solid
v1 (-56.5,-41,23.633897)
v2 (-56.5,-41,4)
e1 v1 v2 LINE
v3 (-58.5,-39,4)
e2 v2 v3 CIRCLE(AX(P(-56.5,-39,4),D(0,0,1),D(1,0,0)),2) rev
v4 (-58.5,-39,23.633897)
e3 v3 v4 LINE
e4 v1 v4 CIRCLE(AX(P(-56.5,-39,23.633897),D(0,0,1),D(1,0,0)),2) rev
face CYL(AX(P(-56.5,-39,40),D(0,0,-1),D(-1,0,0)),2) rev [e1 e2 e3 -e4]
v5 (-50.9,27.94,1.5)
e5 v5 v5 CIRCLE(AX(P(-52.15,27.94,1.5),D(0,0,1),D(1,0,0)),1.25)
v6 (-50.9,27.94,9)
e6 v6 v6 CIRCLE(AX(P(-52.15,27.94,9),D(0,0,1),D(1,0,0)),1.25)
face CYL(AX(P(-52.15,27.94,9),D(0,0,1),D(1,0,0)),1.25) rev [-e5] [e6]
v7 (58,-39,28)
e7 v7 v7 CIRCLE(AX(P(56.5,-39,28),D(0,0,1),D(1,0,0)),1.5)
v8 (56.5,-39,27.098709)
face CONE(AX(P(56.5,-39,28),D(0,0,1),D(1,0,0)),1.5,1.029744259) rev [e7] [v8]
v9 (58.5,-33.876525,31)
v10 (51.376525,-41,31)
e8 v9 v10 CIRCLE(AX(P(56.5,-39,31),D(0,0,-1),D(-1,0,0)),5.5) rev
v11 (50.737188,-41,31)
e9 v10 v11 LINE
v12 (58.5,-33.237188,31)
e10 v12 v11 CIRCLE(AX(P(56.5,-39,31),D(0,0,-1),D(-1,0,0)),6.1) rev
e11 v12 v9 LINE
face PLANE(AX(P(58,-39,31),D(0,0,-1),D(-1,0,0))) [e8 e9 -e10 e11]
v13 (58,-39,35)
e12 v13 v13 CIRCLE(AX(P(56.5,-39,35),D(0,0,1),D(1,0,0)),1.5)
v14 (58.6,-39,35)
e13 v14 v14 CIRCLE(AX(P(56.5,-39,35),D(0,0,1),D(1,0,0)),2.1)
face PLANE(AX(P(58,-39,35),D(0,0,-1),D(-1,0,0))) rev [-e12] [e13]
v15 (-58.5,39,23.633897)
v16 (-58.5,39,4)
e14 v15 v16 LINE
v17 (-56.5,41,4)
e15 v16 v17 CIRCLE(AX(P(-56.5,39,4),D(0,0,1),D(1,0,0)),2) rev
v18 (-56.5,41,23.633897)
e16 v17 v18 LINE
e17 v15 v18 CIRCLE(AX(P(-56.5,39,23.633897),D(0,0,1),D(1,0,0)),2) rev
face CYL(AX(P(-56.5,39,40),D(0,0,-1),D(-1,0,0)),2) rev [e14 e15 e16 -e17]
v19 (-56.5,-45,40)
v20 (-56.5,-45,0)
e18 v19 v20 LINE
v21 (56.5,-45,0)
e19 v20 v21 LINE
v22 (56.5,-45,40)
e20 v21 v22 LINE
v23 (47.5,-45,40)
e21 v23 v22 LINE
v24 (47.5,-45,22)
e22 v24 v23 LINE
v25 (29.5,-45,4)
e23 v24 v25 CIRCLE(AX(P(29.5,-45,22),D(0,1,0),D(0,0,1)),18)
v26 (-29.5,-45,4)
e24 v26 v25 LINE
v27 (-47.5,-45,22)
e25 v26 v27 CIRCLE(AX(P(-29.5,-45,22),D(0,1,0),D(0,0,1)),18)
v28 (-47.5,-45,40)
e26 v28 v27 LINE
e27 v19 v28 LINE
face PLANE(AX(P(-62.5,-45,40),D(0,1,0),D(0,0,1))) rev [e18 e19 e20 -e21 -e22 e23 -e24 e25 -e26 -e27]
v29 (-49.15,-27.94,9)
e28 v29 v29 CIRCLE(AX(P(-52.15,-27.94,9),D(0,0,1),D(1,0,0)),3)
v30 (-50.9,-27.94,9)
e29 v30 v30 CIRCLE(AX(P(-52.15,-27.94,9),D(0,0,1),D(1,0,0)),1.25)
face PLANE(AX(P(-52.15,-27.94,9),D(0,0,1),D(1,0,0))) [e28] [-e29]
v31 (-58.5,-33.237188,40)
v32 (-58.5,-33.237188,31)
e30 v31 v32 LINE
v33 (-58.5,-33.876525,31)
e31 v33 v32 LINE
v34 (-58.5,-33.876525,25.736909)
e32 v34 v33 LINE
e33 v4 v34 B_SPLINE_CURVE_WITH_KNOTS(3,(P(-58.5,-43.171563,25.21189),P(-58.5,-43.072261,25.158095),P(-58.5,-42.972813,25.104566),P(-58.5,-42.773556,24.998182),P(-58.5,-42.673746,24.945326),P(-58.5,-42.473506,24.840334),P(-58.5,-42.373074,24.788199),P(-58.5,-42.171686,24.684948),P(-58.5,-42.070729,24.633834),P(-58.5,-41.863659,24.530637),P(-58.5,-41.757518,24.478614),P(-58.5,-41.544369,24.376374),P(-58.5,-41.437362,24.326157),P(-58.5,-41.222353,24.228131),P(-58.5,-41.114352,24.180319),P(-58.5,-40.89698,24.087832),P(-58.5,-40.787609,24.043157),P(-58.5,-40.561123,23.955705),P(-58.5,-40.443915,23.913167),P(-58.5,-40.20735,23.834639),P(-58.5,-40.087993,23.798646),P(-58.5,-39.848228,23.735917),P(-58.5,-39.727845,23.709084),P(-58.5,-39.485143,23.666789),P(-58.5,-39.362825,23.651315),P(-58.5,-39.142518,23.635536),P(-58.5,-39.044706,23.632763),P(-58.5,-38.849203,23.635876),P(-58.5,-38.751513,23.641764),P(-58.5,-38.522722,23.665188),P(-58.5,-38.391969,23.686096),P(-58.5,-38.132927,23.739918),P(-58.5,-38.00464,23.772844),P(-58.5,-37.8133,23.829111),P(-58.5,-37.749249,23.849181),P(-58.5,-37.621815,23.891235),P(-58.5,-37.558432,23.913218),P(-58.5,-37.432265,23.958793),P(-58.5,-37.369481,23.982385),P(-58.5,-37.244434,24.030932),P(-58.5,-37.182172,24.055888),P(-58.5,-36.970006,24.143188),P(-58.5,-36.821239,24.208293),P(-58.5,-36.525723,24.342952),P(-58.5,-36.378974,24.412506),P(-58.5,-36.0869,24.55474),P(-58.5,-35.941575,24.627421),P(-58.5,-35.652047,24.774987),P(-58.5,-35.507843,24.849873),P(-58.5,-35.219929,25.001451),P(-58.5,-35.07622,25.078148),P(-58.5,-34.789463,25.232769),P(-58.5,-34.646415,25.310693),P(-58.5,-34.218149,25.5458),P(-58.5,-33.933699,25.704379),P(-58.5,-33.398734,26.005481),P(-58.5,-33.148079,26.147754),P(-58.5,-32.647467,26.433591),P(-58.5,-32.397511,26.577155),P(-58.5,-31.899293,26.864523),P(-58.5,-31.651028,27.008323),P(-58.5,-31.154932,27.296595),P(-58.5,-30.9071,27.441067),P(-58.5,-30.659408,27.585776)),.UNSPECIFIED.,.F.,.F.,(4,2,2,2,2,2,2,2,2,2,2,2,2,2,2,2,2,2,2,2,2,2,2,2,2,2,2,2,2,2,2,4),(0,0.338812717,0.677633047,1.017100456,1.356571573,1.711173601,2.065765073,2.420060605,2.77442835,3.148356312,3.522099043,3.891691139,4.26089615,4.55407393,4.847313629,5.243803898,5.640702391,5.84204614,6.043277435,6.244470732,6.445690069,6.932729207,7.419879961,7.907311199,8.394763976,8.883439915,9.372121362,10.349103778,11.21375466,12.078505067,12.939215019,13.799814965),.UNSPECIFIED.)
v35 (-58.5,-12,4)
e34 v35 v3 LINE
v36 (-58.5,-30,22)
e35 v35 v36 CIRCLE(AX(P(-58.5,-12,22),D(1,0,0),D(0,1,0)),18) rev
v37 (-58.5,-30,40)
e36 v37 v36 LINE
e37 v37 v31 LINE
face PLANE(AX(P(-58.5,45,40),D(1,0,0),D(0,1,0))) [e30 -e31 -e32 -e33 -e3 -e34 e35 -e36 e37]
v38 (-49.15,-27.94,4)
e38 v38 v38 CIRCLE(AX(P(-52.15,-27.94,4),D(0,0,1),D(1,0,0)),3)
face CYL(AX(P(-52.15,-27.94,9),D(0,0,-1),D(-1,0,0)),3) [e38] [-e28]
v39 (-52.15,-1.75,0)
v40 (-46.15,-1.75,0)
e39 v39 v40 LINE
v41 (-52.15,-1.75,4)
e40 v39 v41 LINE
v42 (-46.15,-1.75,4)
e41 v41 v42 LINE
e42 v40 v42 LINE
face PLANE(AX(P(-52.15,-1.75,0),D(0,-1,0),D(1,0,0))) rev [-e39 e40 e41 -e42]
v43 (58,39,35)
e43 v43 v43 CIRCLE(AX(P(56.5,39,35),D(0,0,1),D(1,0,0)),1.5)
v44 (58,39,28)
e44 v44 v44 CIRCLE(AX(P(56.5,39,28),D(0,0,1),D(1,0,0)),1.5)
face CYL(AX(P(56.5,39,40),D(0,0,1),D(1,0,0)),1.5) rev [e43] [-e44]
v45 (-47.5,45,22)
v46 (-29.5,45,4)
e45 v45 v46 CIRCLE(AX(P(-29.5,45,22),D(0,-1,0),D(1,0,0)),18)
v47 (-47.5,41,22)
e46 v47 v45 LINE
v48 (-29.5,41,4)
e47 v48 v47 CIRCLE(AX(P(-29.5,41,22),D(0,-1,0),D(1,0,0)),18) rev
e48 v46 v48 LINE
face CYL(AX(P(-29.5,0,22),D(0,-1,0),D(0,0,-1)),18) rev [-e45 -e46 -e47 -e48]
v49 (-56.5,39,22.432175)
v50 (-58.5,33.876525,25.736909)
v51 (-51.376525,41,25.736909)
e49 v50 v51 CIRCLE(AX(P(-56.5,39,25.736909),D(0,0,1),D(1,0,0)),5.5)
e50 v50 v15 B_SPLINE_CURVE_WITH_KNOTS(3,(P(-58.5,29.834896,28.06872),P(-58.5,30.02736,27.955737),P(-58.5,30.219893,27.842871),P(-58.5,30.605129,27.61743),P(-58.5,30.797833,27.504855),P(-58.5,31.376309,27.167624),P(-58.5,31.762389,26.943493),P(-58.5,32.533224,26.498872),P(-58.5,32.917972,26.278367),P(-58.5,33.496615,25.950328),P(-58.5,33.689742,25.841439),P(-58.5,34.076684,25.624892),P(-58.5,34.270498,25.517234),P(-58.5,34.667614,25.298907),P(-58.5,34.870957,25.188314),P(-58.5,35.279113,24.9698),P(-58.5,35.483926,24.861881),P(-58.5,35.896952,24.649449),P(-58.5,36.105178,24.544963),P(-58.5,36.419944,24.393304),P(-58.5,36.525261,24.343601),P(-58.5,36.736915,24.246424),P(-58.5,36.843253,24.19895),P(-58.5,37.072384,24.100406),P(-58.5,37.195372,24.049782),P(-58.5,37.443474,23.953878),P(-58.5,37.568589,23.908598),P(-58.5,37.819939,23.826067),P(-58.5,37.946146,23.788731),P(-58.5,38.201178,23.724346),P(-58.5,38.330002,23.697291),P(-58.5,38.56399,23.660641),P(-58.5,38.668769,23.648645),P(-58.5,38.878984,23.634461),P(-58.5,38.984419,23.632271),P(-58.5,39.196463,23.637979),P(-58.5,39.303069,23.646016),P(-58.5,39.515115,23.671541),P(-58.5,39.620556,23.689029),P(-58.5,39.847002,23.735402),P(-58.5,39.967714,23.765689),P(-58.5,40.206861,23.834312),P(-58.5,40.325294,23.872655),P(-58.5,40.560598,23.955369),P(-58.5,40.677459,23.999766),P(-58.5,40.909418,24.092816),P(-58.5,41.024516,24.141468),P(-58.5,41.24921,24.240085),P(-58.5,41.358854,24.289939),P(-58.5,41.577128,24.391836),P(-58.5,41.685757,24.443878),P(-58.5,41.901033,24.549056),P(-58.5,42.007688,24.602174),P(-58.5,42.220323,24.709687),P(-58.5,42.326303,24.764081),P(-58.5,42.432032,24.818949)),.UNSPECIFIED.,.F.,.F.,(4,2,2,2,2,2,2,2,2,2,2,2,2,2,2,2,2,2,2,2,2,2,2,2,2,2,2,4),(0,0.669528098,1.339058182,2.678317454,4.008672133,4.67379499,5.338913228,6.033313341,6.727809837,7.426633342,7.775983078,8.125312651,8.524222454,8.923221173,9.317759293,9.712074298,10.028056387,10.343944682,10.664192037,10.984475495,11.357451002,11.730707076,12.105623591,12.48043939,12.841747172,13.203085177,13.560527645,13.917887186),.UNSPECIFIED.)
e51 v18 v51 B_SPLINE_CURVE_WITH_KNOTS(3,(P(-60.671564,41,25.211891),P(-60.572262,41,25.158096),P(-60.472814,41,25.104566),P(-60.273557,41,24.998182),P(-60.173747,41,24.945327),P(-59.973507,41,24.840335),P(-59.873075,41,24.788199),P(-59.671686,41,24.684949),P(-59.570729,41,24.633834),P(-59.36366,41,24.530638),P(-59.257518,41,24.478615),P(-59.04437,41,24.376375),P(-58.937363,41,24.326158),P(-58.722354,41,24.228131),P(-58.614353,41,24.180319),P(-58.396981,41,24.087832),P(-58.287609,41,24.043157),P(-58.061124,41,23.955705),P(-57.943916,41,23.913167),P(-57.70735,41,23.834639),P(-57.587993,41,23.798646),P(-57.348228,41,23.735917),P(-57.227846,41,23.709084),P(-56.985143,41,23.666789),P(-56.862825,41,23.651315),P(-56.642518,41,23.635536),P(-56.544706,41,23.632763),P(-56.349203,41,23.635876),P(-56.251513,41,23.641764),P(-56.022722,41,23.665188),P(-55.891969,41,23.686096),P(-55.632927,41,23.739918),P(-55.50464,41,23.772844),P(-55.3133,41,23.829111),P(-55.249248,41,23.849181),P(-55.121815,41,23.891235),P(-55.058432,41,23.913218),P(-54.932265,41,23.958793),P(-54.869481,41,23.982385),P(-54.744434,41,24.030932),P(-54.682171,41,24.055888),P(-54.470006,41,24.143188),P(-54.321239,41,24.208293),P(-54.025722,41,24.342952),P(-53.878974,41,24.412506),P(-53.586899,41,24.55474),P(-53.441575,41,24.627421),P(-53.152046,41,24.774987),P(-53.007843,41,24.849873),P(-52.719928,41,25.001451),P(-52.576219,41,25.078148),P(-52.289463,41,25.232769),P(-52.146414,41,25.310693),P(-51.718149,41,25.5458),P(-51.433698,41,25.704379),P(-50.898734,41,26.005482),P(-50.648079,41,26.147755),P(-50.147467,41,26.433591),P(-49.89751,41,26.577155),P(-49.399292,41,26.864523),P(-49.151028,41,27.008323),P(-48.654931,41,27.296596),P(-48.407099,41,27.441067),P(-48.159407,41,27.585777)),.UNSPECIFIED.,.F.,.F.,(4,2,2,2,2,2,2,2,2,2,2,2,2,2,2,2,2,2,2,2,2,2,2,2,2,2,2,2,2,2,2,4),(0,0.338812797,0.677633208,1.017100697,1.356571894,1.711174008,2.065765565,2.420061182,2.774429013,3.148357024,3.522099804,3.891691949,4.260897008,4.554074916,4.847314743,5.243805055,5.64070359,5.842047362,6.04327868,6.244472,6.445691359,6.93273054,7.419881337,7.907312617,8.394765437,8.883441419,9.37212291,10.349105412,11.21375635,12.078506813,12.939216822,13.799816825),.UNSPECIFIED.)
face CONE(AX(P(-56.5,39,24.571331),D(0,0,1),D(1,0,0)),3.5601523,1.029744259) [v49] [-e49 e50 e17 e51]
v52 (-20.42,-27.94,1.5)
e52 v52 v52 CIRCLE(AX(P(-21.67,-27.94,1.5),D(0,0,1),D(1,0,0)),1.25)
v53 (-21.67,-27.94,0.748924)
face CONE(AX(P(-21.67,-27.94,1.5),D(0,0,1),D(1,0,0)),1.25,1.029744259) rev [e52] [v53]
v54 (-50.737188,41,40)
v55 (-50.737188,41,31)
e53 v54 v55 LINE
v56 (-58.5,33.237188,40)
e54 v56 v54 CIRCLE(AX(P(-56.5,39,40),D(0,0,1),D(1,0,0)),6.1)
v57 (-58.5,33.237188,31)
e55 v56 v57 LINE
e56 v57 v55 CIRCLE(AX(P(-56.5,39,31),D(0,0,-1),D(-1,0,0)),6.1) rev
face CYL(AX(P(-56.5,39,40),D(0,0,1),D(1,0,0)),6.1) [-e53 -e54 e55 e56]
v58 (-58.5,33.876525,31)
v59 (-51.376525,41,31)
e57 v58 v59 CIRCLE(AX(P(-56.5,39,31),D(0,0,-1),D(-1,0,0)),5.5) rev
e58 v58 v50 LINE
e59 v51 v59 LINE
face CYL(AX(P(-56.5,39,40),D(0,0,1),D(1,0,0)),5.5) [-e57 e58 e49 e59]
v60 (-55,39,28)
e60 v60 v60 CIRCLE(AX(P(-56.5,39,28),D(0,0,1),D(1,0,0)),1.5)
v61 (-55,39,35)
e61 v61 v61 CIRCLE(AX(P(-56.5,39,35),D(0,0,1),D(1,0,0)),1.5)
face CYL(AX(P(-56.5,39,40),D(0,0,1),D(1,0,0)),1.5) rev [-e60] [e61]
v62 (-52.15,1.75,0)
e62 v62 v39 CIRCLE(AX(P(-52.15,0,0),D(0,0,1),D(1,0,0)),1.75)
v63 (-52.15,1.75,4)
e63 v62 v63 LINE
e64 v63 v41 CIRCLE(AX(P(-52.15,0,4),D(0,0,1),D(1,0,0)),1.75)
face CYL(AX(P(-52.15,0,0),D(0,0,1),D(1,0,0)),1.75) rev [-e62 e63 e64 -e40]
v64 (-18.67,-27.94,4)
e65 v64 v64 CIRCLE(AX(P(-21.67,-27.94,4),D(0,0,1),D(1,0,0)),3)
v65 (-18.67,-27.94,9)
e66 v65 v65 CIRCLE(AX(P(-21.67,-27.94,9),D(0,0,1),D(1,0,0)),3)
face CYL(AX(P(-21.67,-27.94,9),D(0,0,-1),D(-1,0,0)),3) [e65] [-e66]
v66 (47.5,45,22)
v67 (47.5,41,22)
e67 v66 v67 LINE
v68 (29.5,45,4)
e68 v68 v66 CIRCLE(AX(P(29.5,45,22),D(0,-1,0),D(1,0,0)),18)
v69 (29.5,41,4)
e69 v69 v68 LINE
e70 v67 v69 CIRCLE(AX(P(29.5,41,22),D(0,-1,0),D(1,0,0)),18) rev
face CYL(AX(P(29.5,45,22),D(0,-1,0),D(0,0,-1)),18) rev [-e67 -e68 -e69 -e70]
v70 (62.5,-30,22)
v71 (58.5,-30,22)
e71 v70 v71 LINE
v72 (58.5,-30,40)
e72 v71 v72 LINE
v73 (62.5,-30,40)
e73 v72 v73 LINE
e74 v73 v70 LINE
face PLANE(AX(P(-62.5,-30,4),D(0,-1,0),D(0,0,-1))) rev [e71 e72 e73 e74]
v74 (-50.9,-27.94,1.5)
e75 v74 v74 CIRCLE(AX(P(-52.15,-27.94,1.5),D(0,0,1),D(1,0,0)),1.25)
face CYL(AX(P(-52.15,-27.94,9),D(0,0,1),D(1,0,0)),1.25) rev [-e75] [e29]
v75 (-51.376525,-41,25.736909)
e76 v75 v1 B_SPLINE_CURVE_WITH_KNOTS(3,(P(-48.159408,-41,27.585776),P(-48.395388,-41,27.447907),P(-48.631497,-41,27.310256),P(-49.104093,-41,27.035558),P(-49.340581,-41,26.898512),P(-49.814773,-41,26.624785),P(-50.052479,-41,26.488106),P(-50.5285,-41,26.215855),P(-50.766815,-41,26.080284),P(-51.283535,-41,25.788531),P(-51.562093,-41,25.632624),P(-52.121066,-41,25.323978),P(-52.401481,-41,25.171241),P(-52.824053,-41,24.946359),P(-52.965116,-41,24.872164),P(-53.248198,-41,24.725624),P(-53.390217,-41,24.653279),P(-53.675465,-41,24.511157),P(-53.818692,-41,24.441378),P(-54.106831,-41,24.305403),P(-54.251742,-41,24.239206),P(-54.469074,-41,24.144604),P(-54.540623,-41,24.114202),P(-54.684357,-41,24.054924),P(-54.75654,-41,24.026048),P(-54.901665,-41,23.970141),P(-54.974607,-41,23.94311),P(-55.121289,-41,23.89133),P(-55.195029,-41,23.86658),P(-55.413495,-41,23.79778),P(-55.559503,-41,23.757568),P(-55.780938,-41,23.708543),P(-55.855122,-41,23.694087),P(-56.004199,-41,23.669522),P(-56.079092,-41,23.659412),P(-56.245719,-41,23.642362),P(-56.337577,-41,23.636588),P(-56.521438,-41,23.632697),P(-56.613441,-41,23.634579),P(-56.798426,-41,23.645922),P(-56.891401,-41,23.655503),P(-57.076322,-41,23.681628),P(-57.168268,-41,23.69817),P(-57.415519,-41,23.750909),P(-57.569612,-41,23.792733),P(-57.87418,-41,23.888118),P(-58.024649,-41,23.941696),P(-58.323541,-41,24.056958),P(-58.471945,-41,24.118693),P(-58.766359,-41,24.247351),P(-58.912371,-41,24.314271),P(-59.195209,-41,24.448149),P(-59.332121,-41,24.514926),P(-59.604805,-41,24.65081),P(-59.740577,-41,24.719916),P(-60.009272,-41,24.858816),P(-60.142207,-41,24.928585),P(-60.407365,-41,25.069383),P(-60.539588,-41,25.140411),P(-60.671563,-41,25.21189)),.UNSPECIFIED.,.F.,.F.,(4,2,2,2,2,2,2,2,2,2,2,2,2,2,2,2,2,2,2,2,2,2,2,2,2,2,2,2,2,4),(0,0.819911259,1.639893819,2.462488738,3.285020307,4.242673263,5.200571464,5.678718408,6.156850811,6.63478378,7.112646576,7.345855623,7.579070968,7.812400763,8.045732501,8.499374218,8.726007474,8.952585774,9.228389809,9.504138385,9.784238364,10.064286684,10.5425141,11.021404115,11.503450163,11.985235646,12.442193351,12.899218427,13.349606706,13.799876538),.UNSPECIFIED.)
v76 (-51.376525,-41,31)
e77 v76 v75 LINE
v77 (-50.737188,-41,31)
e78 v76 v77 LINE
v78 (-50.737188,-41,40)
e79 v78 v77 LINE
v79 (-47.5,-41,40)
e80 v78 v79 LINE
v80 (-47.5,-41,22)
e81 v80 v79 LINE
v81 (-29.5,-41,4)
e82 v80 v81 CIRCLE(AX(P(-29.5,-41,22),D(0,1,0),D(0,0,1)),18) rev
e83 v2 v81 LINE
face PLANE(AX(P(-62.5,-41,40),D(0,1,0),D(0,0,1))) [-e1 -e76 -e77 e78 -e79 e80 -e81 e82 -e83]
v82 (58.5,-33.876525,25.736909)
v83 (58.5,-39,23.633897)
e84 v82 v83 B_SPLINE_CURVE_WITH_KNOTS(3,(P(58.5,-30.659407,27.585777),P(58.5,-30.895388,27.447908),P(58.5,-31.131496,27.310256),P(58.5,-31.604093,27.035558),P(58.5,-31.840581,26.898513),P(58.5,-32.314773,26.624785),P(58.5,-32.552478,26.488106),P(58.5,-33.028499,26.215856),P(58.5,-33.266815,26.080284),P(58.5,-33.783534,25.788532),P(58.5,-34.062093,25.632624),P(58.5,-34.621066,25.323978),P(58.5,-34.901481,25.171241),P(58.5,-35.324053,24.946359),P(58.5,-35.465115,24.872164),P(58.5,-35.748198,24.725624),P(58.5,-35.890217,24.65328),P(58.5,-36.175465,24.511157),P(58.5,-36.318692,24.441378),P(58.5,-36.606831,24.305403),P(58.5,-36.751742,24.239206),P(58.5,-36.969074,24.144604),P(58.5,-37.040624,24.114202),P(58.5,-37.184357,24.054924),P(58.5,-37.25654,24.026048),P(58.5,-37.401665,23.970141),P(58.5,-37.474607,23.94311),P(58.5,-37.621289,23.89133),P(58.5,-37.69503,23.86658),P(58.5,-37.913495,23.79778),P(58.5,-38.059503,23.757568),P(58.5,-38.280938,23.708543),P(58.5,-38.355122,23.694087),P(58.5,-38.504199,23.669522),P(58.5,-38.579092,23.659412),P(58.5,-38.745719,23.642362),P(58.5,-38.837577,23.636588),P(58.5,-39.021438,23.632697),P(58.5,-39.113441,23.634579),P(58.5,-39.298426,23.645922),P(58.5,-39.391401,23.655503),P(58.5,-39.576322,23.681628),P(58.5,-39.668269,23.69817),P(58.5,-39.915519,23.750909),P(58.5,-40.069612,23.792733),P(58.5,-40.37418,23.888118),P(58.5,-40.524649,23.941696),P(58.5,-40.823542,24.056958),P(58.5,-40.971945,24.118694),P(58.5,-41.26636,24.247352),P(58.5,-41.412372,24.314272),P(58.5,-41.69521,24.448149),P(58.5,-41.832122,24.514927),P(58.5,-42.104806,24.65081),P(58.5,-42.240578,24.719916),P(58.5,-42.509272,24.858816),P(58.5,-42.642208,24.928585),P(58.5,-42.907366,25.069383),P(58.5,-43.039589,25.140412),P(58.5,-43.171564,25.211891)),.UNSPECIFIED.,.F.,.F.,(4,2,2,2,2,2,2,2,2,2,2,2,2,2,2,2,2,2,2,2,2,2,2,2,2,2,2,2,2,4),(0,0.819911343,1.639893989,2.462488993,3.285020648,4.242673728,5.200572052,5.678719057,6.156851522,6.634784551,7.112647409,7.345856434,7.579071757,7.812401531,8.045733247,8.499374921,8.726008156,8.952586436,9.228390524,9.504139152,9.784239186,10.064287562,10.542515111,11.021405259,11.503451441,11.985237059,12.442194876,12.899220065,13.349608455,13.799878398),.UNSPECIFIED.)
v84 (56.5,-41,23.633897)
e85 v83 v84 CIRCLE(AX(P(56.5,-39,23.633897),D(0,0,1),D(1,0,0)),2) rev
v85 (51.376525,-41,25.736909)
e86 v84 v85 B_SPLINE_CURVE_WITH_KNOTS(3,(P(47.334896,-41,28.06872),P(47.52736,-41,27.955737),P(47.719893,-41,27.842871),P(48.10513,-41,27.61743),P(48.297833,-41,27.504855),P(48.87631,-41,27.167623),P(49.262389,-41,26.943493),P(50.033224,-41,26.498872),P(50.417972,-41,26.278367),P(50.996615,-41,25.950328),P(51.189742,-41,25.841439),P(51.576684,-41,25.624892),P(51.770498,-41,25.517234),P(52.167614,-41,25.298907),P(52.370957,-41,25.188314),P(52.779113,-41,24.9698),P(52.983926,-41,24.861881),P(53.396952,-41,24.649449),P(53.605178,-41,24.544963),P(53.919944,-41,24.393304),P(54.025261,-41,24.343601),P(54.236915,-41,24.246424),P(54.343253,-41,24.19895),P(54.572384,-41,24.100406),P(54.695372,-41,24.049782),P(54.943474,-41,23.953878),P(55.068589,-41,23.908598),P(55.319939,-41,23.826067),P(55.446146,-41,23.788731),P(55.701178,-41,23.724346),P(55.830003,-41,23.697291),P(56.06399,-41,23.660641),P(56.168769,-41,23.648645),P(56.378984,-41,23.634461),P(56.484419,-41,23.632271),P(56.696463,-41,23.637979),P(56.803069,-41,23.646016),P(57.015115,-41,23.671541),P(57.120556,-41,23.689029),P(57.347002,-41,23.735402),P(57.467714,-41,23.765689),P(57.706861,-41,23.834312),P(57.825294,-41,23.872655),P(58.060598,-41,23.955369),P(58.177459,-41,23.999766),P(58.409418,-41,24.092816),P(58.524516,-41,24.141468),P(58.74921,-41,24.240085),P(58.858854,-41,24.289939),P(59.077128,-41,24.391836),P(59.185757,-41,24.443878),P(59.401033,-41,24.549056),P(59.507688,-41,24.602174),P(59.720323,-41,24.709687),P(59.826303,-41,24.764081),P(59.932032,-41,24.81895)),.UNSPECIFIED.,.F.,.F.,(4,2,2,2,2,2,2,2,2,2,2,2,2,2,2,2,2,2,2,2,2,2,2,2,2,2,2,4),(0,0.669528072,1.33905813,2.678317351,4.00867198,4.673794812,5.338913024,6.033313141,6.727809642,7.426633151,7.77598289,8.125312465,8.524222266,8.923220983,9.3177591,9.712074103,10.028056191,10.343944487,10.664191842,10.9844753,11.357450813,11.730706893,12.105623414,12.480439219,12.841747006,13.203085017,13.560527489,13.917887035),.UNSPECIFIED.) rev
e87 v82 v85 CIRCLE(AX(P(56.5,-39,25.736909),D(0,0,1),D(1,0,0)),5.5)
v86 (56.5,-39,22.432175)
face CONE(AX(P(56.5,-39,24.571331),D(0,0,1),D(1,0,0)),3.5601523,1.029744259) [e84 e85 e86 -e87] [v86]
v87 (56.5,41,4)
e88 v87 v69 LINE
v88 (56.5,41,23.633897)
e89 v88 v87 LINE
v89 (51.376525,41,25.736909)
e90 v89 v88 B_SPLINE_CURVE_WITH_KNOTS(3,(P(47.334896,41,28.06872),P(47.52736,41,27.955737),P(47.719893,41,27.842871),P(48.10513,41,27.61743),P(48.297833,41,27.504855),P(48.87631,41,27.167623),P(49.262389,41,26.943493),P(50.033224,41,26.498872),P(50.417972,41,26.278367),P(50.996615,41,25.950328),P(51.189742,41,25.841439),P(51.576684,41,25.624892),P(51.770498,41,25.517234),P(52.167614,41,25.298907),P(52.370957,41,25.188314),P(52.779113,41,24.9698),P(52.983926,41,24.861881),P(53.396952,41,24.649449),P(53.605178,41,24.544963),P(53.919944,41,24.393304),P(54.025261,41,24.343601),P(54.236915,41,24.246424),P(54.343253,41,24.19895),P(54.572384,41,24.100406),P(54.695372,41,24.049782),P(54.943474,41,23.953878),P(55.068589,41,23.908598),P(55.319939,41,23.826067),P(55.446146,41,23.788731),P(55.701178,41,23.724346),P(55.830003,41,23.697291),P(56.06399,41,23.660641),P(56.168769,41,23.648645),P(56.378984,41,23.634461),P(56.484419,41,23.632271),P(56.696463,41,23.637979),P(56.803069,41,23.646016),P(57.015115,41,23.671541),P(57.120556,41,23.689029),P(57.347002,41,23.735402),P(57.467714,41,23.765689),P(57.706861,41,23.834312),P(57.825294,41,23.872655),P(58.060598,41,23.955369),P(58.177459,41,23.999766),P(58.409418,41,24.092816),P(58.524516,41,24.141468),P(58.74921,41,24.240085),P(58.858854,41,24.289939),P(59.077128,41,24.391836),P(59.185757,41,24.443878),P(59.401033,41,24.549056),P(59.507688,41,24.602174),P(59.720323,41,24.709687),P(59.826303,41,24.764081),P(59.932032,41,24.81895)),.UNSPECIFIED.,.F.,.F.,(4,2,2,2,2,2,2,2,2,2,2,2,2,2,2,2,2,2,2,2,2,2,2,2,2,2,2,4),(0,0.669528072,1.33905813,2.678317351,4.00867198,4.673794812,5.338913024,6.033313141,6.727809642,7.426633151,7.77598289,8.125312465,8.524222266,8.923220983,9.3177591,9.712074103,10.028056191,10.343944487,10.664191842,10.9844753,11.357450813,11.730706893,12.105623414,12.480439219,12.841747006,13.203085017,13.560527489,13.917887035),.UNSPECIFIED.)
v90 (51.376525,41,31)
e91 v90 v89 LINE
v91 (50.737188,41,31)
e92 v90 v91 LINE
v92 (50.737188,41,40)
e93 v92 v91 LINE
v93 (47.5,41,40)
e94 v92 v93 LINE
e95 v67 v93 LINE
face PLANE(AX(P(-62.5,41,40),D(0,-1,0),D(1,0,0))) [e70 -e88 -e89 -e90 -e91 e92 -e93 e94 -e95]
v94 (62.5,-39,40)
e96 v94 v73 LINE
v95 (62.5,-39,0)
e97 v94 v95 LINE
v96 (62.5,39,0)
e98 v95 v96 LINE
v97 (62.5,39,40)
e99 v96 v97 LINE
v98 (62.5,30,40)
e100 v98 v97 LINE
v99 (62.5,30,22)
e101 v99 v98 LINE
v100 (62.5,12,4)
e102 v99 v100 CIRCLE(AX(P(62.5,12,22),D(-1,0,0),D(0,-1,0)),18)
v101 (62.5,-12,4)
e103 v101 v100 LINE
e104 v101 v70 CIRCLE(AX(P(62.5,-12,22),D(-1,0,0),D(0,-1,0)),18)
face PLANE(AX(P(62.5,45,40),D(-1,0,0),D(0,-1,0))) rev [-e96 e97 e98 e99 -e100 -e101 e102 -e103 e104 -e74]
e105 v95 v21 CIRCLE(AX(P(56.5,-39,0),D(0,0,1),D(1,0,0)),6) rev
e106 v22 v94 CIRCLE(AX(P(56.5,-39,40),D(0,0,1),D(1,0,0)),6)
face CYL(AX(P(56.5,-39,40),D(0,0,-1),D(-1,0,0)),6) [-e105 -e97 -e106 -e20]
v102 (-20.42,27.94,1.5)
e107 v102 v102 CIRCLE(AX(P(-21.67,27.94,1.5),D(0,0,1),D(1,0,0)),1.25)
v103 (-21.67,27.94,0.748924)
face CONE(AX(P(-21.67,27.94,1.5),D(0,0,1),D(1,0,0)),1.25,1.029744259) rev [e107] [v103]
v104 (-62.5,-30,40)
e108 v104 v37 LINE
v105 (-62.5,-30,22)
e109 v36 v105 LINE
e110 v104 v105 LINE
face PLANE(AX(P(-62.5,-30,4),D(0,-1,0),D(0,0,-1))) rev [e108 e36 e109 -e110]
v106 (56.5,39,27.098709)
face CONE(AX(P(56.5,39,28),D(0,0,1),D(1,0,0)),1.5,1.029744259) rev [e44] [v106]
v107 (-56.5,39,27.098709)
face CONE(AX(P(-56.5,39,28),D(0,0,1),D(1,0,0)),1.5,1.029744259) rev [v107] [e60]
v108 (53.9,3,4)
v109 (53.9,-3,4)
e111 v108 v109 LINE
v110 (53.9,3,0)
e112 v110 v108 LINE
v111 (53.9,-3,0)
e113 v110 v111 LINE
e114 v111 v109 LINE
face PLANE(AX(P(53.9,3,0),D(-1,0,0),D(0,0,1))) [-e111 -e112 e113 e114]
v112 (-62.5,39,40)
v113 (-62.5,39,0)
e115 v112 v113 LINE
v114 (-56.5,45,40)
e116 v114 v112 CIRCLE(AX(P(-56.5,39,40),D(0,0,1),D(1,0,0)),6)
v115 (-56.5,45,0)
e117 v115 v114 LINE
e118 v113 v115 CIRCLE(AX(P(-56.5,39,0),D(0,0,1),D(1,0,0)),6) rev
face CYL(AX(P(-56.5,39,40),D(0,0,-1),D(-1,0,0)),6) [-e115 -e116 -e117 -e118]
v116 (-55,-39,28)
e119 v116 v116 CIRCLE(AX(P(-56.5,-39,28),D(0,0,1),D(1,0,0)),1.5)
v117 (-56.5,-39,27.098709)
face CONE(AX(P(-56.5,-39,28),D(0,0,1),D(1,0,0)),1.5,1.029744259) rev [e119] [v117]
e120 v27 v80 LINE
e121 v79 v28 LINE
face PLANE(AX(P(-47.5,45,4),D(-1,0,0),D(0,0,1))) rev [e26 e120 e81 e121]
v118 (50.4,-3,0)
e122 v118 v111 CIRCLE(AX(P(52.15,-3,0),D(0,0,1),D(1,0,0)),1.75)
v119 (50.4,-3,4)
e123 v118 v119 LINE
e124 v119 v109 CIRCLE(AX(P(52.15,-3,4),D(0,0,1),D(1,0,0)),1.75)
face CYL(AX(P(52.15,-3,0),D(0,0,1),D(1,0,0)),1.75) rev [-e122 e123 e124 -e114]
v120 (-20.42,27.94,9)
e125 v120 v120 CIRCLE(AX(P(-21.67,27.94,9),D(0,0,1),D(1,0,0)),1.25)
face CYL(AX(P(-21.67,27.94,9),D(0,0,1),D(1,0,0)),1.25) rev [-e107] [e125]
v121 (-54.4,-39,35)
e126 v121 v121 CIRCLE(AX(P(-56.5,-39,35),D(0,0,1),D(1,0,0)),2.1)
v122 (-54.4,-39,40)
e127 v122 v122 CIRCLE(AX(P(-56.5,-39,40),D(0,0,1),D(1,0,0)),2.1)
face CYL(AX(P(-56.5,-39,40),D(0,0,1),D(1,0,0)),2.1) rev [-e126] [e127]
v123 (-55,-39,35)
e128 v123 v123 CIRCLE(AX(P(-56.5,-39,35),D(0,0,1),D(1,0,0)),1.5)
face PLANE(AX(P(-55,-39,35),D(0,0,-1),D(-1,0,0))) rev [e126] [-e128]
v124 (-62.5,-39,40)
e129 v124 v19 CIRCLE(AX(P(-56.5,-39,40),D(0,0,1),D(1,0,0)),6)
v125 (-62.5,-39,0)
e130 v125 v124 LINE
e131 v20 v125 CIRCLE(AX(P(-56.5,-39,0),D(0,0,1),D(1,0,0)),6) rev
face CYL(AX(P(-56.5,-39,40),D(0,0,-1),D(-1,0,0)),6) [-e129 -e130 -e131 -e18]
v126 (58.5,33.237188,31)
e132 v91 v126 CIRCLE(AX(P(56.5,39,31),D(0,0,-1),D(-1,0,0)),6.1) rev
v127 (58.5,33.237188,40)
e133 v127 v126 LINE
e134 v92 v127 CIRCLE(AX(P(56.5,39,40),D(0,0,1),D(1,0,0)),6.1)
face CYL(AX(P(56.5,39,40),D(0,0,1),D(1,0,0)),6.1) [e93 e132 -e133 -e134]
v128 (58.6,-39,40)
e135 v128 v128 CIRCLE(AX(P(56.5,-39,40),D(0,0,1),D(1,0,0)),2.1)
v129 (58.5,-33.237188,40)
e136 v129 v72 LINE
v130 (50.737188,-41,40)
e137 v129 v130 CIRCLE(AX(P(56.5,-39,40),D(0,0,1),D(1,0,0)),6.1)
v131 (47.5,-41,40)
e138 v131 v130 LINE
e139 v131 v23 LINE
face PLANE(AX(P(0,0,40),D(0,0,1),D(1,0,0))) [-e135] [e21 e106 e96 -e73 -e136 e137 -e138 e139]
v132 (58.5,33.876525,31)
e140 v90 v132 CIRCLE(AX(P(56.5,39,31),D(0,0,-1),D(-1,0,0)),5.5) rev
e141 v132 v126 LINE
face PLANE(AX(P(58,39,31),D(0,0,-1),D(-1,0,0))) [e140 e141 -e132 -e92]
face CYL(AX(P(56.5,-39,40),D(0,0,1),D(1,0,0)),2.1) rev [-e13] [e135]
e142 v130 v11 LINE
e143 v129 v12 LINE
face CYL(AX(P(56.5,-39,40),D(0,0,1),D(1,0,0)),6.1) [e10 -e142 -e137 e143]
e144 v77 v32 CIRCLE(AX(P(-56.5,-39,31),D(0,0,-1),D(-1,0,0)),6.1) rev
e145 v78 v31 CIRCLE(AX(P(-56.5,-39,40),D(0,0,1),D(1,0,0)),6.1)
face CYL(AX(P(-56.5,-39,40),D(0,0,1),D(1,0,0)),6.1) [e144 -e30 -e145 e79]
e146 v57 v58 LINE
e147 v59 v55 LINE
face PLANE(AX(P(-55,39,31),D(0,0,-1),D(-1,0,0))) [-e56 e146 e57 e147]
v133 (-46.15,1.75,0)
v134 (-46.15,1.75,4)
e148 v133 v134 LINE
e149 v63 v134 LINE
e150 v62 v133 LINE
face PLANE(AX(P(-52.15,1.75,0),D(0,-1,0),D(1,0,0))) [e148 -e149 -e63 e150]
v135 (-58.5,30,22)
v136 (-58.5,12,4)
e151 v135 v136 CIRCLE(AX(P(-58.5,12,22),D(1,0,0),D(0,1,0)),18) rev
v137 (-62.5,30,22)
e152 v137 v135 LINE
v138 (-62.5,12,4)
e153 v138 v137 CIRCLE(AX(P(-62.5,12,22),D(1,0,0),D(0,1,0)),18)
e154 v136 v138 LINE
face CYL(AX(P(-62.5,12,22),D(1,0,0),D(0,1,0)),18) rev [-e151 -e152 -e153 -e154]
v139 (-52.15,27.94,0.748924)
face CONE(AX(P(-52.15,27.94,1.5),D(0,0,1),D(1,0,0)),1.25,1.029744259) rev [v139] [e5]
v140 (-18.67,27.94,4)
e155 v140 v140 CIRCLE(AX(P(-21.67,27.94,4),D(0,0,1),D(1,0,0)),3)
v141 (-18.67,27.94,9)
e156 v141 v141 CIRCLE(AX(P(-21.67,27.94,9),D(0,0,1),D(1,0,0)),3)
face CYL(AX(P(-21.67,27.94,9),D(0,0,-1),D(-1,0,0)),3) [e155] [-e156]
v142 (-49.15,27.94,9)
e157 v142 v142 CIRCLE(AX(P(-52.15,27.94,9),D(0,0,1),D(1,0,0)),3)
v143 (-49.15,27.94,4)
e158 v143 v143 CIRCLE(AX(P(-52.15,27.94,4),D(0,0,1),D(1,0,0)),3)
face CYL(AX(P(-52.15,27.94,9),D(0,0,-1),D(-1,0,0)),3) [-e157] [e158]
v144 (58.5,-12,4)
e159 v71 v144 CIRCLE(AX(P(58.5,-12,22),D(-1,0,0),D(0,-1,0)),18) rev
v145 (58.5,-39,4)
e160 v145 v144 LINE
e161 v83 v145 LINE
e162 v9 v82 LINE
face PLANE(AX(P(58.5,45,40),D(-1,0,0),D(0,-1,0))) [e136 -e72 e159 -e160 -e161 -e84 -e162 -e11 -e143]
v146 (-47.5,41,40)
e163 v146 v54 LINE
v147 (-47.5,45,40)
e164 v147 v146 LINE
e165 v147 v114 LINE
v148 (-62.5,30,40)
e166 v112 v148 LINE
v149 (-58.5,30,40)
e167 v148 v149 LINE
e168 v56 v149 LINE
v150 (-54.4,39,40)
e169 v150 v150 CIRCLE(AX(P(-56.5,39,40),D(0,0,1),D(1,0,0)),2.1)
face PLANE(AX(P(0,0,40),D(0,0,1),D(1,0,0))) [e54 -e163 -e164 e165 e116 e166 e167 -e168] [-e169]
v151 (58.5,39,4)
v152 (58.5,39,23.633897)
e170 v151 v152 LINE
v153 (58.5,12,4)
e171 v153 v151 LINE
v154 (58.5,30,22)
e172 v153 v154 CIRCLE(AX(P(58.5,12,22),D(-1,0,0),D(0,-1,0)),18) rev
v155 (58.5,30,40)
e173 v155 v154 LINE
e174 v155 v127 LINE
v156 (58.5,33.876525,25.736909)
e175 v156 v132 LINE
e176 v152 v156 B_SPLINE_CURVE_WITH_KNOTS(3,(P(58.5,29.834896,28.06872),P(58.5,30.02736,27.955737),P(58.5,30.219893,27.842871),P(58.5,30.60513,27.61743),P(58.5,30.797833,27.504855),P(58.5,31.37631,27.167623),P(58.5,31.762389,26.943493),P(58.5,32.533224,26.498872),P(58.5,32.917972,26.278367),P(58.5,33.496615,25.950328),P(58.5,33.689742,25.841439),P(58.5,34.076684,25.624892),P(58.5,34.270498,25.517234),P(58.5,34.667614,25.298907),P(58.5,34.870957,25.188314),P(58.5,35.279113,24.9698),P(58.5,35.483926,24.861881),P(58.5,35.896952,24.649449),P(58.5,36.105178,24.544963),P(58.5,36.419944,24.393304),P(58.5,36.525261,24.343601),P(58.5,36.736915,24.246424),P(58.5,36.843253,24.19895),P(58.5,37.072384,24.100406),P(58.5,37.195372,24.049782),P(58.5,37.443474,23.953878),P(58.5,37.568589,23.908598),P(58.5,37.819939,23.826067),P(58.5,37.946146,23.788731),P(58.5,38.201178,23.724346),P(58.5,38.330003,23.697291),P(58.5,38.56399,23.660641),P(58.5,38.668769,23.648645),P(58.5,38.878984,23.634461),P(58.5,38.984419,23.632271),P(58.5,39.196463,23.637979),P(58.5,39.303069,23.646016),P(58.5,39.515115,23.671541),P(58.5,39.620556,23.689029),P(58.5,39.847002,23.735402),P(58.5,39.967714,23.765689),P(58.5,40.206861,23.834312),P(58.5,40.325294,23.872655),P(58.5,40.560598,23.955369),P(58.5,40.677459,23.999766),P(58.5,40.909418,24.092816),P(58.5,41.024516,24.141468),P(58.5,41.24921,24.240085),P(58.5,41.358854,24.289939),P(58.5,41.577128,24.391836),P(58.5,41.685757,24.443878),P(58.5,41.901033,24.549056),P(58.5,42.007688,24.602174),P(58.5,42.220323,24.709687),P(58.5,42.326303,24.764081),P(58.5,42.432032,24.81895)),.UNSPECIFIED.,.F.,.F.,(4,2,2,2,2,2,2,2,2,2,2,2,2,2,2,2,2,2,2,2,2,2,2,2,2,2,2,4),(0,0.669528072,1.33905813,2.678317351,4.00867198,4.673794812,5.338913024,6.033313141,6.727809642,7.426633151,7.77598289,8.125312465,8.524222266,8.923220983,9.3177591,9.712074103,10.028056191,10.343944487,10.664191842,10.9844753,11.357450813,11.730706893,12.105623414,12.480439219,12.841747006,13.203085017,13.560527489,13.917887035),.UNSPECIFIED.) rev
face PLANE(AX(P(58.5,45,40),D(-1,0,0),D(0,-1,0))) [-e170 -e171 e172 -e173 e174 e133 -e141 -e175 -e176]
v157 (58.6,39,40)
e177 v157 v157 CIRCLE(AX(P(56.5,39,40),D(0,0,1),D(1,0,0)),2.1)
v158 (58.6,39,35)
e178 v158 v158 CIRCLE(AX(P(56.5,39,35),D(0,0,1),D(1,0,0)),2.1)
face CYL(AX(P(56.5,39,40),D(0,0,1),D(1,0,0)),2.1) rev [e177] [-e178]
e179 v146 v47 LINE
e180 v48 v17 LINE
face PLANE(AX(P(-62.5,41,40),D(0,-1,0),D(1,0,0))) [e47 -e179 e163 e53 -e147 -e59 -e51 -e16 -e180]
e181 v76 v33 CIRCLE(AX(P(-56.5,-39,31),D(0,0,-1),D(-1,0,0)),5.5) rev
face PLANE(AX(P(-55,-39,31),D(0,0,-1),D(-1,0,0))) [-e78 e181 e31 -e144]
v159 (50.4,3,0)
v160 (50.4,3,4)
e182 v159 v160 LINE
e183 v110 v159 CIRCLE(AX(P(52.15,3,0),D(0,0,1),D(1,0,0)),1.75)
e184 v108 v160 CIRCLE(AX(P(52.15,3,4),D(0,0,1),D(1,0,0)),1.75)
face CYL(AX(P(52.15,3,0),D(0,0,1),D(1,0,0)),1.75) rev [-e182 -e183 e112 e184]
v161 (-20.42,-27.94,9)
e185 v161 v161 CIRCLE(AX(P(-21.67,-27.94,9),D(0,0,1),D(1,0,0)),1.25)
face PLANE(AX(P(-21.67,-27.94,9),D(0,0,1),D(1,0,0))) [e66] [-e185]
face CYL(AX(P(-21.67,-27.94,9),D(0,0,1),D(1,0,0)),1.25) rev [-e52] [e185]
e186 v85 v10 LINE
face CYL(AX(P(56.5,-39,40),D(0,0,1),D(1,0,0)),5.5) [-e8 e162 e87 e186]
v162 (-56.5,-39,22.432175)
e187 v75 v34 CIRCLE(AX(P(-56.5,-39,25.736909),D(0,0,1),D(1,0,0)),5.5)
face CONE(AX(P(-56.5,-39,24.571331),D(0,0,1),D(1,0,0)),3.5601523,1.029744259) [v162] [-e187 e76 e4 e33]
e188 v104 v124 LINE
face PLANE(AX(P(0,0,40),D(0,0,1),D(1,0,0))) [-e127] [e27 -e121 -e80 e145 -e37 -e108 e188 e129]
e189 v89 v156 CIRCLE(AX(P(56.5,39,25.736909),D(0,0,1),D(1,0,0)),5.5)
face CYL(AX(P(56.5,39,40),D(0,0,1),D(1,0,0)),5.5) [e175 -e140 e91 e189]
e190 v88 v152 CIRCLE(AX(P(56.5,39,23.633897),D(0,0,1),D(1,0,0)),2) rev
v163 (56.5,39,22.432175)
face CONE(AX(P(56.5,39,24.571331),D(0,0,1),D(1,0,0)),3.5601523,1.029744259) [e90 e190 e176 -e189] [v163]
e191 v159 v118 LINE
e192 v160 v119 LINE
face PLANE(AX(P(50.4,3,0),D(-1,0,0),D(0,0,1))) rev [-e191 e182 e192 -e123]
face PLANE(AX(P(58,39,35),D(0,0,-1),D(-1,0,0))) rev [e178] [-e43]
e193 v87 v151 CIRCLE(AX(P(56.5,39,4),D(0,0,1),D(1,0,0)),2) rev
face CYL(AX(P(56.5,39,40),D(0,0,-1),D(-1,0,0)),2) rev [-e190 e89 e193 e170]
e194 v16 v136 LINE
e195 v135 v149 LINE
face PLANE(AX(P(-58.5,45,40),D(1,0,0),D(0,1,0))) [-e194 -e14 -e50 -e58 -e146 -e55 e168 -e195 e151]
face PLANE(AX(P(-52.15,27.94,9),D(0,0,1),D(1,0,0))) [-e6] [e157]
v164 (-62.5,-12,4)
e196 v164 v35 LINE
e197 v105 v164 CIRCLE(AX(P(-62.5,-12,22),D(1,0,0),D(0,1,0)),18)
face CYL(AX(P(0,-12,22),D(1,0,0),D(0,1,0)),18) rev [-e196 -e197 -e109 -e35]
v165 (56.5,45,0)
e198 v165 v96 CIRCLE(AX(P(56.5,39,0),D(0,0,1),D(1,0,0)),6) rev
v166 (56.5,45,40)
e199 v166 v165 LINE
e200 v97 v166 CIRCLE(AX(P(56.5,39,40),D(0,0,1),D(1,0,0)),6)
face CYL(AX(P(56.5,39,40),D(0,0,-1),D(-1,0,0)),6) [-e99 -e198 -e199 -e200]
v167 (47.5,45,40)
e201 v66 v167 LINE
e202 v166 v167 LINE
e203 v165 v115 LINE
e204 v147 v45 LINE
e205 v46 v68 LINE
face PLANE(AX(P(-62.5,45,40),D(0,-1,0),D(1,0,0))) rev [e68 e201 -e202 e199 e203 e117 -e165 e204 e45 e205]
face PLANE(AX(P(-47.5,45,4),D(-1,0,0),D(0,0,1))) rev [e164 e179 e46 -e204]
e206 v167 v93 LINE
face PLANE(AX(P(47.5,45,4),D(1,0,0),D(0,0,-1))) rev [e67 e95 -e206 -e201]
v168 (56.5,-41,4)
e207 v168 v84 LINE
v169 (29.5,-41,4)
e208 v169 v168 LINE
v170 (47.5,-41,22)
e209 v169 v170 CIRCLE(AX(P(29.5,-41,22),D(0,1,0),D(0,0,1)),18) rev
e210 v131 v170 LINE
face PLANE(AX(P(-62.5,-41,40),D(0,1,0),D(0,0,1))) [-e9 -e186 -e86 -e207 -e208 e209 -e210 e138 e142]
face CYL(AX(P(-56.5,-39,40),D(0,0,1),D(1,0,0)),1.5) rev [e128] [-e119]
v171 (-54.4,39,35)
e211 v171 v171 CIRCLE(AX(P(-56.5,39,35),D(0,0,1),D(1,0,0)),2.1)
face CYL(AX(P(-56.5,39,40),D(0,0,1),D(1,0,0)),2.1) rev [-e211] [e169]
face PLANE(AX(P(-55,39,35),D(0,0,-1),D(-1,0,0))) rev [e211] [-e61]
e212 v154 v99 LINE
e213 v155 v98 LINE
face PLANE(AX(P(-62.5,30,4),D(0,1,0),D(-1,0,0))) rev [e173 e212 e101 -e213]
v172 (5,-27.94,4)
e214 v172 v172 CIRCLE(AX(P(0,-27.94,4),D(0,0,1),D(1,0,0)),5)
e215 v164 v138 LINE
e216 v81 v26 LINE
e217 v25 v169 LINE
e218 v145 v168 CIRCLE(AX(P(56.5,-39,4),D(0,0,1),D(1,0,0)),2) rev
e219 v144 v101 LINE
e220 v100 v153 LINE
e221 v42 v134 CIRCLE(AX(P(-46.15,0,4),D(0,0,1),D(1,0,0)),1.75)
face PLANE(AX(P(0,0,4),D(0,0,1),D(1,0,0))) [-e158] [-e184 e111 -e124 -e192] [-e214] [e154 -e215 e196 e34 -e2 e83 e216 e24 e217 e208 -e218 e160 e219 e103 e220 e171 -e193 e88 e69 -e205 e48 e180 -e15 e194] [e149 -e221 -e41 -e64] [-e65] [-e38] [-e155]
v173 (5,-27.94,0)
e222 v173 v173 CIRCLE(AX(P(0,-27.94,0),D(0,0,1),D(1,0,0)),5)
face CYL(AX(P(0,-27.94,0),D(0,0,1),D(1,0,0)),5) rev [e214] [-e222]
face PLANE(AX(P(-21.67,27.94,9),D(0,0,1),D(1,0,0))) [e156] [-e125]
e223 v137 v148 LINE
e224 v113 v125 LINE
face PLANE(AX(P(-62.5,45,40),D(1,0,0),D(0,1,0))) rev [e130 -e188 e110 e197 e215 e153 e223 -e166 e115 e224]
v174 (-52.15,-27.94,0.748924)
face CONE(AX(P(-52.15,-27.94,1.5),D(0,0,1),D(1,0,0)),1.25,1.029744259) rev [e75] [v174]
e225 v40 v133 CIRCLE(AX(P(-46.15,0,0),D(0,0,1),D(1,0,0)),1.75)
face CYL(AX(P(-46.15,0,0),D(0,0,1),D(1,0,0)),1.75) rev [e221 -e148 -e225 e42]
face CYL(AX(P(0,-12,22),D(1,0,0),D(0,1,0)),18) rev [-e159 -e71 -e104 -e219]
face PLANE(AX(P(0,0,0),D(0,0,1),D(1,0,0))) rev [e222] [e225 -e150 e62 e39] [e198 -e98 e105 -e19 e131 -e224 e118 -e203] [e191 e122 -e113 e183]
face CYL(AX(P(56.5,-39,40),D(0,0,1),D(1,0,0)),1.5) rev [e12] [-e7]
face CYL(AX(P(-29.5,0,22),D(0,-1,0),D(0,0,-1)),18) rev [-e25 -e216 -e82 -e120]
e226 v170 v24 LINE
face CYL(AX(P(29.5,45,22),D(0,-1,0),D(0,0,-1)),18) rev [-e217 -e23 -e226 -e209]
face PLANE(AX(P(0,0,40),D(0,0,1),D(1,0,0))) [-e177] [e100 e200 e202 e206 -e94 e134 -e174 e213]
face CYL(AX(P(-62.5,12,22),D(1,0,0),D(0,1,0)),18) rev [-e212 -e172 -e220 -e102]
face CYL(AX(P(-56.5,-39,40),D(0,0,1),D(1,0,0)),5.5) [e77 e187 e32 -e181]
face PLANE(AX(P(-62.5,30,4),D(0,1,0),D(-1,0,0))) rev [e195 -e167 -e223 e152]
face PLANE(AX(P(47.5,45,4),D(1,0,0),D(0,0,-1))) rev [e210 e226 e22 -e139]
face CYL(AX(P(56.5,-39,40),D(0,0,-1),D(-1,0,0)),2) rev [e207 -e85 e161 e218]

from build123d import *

# Parameters (mm, degrees)
SKETCH1_W                               = 125
SKETCH1_H                               = 90
BOSS_EXTRUDE1_DEPTH                     = 40
FILLET1_R                               = 6
CBORE_FOR_M5_HEX_HEAD_BOLT1_D           = 3
CBORE_FOR_M5_HEX_HEAD_BOLT1_DEPTH       = 12
CBORE_FOR_M5_HEX_HEAD_BOLT1_CBORE_D     = 4.2
CBORE_FOR_M5_HEX_HEAD_BOLT1_CBORE_DEPTH = 5
CBORE_FOR_M5_HEX_HEAD_BOLT1_TIP         = 0.901290929
SHELL2_START                            = 4
SHELL2_DEPTH                            = 36
SHELL2_2_DEPTH                          = 21.736908887
SHELL2_START_2                          = 23.633896721
SHELL2_3_DEPTH                          = 7.366103279
SKETCH11_W                              = 95
SKETCH11_H                              = 36
CUT_EXTRUDE4_DEPTH                      = 117.645831473
SKETCH12_W                              = 36
SKETCH12_H                              = 60
CUT_EXTRUDE5_DEPTH                      = 139.744369255
SKETCH7_R                               = 3
BOSS_EXTRUDE2_DEPTH                     = 5
M3X0_5_TAPPED_HOLE1_D                   = 2.5
M3X0_5_TAPPED_HOLE1_DEPTH               = 7.5
M3X0_5_TAPPED_HOLE1_TIP                 = 0.751075774
FILLET3_R                               = 18
FILLET4_R                               = 18
CUT_EXTRUDE1_DEPTH                      = 86.013234264
SKETCH7_5_R                             = 5
CUT_EXTRUDE2_DEPTH                      = 86.013234264
CUT_EXTRUDE3_DEPTH                      = 86.013234264


with BuildPart() as part:
    # Sketch1 → Boss-Extrude1 (new body)
    with BuildSketch(Plane.XY):
        Rectangle(SKETCH1_W, SKETCH1_H)
    extrude(amount=BOSS_EXTRUDE1_DEPTH)

    # Fillet1
    fillet1_edges = [part.edges().sort_by_distance(p)[0] for p in [
        (62.5, -45, 20),
        (-62.5, -45, 20),
        (-62.5, 45, 20),
        (62.5, 45, 20),
    ]]
    fillet(fillet1_edges, radius=FILLET1_R)

    # CBORE for M5 Hex Head Bolt1
    with Locations(Plane.XY.offset(40)):
        with Locations((-56.5, 39), (56.5, 39), (56.5, -39), (-56.5, -39)):
            CounterBoreHole(CBORE_FOR_M5_HEX_HEAD_BOLT1_D / 2, CBORE_FOR_M5_HEX_HEAD_BOLT1_CBORE_D / 2, CBORE_FOR_M5_HEX_HEAD_BOLT1_CBORE_DEPTH, depth=CBORE_FOR_M5_HEX_HEAD_BOLT1_DEPTH)
            with Locations((0, 0, -(CBORE_FOR_M5_HEX_HEAD_BOLT1_DEPTH + CBORE_FOR_M5_HEX_HEAD_BOLT1_TIP / 2))):  # 118° drill point
                Cone(0, CBORE_FOR_M5_HEX_HEAD_BOLT1_D / 2, CBORE_FOR_M5_HEX_HEAD_BOLT1_TIP, mode=Mode.SUBTRACT)

    # Shell2: read off the stored shape, not the designer's step
    # Shell2 outline → Shell2 (cut)
    with BuildSketch(Plane.XY.offset(SHELL2_START)):
        with BuildLine():
            ThreePointArc((58.5, 33.237188186), (52.186648635, 34.686648635), (50.737188186, 41))
            Line((50.737188186, 41), (-50.737188186, 41))
            ThreePointArc((-50.737188186, 41), (-52.186648635, 34.686648635), (-58.5, 33.237188186))
            Line((-58.5, 33.237188186), (-58.5, -33.237188186))
            ThreePointArc((-58.5, -33.237188186), (-52.186648635, -34.686648635), (-50.737188186, -41))
            Line((-50.737188186, -41), (50.737188186, -41))
            ThreePointArc((50.737188186, -41), (52.186648635, -34.686648635), (58.5, -33.237188186))
            Line((58.5, -33.237188186), (58.5, 33.237188186))
        make_face()
    extrude(amount=SHELL2_DEPTH, mode=Mode.SUBTRACT)

    # Shell2 2 outline → Shell2 2 (cut)
    with BuildSketch(Plane.XY.offset(SHELL2_START)):
        with BuildLine():
            Line((56.5, 41), (50.737188186, 41))
            ThreePointArc((50.737188186, 41), (52.186648635, 34.686648635), (58.5, 33.237188186))
            Line((58.5, 33.237188186), (58.5, 39))
            ThreePointArc((58.5, 39), (57.914213562, 40.414213562), (56.5, 41))
        make_face()
        with BuildLine():
            ThreePointArc((-58.5, 33.237188186), (-52.186648635, 34.686648635), (-50.737188186, 41))
            Line((-50.737188186, 41), (-56.5, 41))
            ThreePointArc((-56.5, 41), (-57.914213562, 40.414213562), (-58.5, 39))
            Line((-58.5, 39), (-58.5, 33.237188186))
        make_face()
        with BuildLine():
            ThreePointArc((58.5, -33.237188186), (52.186648635, -34.686648635), (50.737188186, -41))
            Line((50.737188186, -41), (56.5, -41))
            ThreePointArc((56.5, -41), (57.914213562, -40.414213562), (58.5, -39))
            Line((58.5, -39), (58.5, -33.237188186))
        make_face()
        with BuildLine():
            ThreePointArc((-50.737188186, -41), (-52.186648635, -34.686648635), (-58.5, -33.237188186))
            Line((-58.5, -33.237188186), (-58.5, -39))
            ThreePointArc((-58.5, -39), (-57.914213562, -40.414213562), (-56.5, -41))
            Line((-56.5, -41), (-50.737188186, -41))
        make_face()
    extrude(amount=SHELL2_2_DEPTH, mode=Mode.SUBTRACT)

    # Shell2 3 outline → Shell2 3 (cut)
    with BuildSketch(Plane.XY.offset(SHELL2_START_2)):
        with BuildLine():
            ThreePointArc((58.5, 33.876524617), (52.610912703, 35.110912703), (51.376524617, 41))
            Line((51.376524617, 41), (50.737188186, 41))
            ThreePointArc((50.737188186, 41), (52.186648635, 34.686648635), (58.5, 33.237188186))
            Line((58.5, 33.237188186), (58.5, 33.876524617))
        make_face()
        with BuildLine():
            ThreePointArc((-58.5, 33.237188186), (-52.186648635, 34.686648635), (-50.737188186, 41))
            Line((-50.737188186, 41), (-51.376524617, 41))
            ThreePointArc((-51.376524617, 41), (-52.610912703, 35.110912703), (-58.5, 33.876524617))
            Line((-58.5, 33.876524617), (-58.5, 33.237188186))
        make_face()
        with BuildLine():
            Line((58.5, -33.876524617), (58.5, -33.237188186))
            ThreePointArc((58.5, -33.237188186), (52.186648635, -34.686648635), (50.737188186, -41))
            Line((50.737188186, -41), (51.376524617, -41))
            ThreePointArc((51.376524617, -41), (52.610912703, -35.110912703), (58.5, -33.876524617))
        make_face()
        with BuildLine():
            ThreePointArc((-50.737188186, -41), (-52.186648635, -34.686648635), (-58.5, -33.237188186))
            Line((-58.5, -33.237188186), (-58.5, -33.876524617))
            ThreePointArc((-58.5, -33.876524617), (-52.610912703, -35.110912703), (-51.376524617, -41))
            Line((-51.376524617, -41), (-50.737188186, -41))
        make_face()
    extrude(amount=SHELL2_3_DEPTH, mode=Mode.SUBTRACT)

    # Shell2 4 outline → Shell2 4 (revolve)
    with BuildSketch(Plane(origin=(56.5, 39, 0), x_dir=(1, 0, 0), z_dir=(0, -1, 0))):
        Polygon((0, 25.736908889), (0, 22.432175483), (5.500000002, 25.736908889), align=None)
    revolve(axis=Axis((56.5, 39, 0), (0, 0, 1)))

    # Shell2 5 outline → Shell2 5 (revolve)
    with BuildSketch(Plane(origin=(56.5, -39, 0), x_dir=(1, 0, 0), z_dir=(0, -1, 0))):
        Polygon((0, 25.736908889), (0, 22.432175483), (5.500000002, 25.736908889), align=None)
    revolve(axis=Axis((56.5, -39, 0), (0, 0, 1)))

    # Shell2 6 outline → Shell2 6 (revolve)
    with BuildSketch(Plane(origin=(-56.5, 39, 0), x_dir=(1, 0, 0), z_dir=(0, -1, 0))):
        Polygon((0, 25.736908889), (0, 22.432175483), (5.500000002, 25.736908889), align=None)
    revolve(axis=Axis((-56.5, 39, 0), (0, 0, 1)))

    # Shell2 7 outline → Shell2 7 (revolve)
    with BuildSketch(Plane(origin=(-56.5, -39, 0), x_dir=(1, 0, 0), z_dir=(0, -1, 0))):
        Polygon((0, 25.736908887), (0, 22.432175483), (5.5, 25.736908887), align=None)
    revolve(axis=Axis((-56.5, -39, 0), (0, 0, 1)))

    # Sketch11 → Cut-Extrude4 (cut, through all)
    with BuildSketch(Plane.XZ.offset(45)):
        with Locations((0, 22)):
            Rectangle(SKETCH11_W, SKETCH11_H)
    extrude(amount=-CUT_EXTRUDE4_DEPTH, mode=Mode.SUBTRACT)

    # Sketch12 → Cut-Extrude5 (cut, through all)
    with BuildSketch(Plane(origin=(62.5, 0, 0), x_dir=(0, 0, -1), z_dir=(1, 0, 0))):
        with Locations((-22, 0)):
            Rectangle(SKETCH12_W, SKETCH12_H)
    extrude(amount=-CUT_EXTRUDE5_DEPTH, mode=Mode.SUBTRACT)

    # Sketch7 → Boss-Extrude2 (add)
    with BuildSketch(Plane.XY.offset(4)):
        with Locations((-52.15, 27.94)):
            Circle(SKETCH7_R)
        with Locations((-21.67, 27.94)):
            Circle(SKETCH7_R)
        with Locations((-52.15, -27.94)):
            Circle(SKETCH7_R)
        with Locations((-21.67, -27.94)):
            Circle(SKETCH7_R)
    extrude(amount=BOSS_EXTRUDE2_DEPTH)

    # M3x0.5 Tapped Hole1
    with Locations(Plane.XY.offset(9)):
        with Locations((-52.15, 27.94), (-21.67, 27.94), (-21.67, -27.94), (-52.15, -27.94)):
            Hole(M3X0_5_TAPPED_HOLE1_D / 2, depth=M3X0_5_TAPPED_HOLE1_DEPTH)
            with Locations((0, 0, -(M3X0_5_TAPPED_HOLE1_DEPTH + M3X0_5_TAPPED_HOLE1_TIP / 2))):  # 118° drill point
                Cone(0, M3X0_5_TAPPED_HOLE1_D / 2, M3X0_5_TAPPED_HOLE1_TIP, mode=Mode.SUBTRACT)

    # Fillet3
    fillet3_edges = [part.edges().sort_by_distance(p)[0] for p in [
        (47.5, 43, 4),
        (-47.5, 43, 4),
        (47.5, -43, 4),
        (-47.5, -43, 4),
    ]]
    fillet(fillet3_edges, radius=FILLET3_R)

    # Fillet4
    fillet4_edges = [part.edges().sort_by_distance(p)[0] for p in [
        (60.5, 30, 4),
        (60.5, -30, 4),
        (-60.5, 30, 4),
        (-60.5, -30, 4),
    ]]
    fillet(fillet4_edges, radius=FILLET4_R)

    # Sketch7<4> → Cut-Extrude1 (cut, through all)
    with BuildSketch(Plane.XY.offset(4)):
        with BuildLine():
            Line((-52.15, 1.75), (-46.15, 1.75))
            ThreePointArc((-46.15, 1.75), (-44.4, 0), (-46.15, -1.75))
            Line((-46.15, -1.75), (-52.15, -1.75))
            ThreePointArc((-52.15, -1.75), (-53.9, 0), (-52.15, 1.75))
        make_face()
    extrude(amount=-CUT_EXTRUDE1_DEPTH, mode=Mode.SUBTRACT)

    # Sketch7<5> → Cut-Extrude2 (cut, through all)
    with BuildSketch(Plane.XY.offset(4)):
        with Locations((0, -27.94)):
            Circle(SKETCH7_5_R)
    extrude(amount=-CUT_EXTRUDE2_DEPTH, mode=Mode.SUBTRACT)

    # Sketch7<6> → Cut-Extrude3 (cut, through all)
    with BuildSketch(Plane.XY.offset(4)):
        with BuildLine():
            Line((53.9, 3), (53.9, -3))
            ThreePointArc((53.9, -3), (52.15, -4.75), (50.4, -3))
            Line((50.4, -3), (50.4, 3))
            ThreePointArc((50.4, 3), (52.15, 4.75), (53.9, 3))
        make_face()
    extrude(amount=-CUT_EXTRUDE3_DEPTH, mode=Mode.SUBTRACT)


solid = part.part
